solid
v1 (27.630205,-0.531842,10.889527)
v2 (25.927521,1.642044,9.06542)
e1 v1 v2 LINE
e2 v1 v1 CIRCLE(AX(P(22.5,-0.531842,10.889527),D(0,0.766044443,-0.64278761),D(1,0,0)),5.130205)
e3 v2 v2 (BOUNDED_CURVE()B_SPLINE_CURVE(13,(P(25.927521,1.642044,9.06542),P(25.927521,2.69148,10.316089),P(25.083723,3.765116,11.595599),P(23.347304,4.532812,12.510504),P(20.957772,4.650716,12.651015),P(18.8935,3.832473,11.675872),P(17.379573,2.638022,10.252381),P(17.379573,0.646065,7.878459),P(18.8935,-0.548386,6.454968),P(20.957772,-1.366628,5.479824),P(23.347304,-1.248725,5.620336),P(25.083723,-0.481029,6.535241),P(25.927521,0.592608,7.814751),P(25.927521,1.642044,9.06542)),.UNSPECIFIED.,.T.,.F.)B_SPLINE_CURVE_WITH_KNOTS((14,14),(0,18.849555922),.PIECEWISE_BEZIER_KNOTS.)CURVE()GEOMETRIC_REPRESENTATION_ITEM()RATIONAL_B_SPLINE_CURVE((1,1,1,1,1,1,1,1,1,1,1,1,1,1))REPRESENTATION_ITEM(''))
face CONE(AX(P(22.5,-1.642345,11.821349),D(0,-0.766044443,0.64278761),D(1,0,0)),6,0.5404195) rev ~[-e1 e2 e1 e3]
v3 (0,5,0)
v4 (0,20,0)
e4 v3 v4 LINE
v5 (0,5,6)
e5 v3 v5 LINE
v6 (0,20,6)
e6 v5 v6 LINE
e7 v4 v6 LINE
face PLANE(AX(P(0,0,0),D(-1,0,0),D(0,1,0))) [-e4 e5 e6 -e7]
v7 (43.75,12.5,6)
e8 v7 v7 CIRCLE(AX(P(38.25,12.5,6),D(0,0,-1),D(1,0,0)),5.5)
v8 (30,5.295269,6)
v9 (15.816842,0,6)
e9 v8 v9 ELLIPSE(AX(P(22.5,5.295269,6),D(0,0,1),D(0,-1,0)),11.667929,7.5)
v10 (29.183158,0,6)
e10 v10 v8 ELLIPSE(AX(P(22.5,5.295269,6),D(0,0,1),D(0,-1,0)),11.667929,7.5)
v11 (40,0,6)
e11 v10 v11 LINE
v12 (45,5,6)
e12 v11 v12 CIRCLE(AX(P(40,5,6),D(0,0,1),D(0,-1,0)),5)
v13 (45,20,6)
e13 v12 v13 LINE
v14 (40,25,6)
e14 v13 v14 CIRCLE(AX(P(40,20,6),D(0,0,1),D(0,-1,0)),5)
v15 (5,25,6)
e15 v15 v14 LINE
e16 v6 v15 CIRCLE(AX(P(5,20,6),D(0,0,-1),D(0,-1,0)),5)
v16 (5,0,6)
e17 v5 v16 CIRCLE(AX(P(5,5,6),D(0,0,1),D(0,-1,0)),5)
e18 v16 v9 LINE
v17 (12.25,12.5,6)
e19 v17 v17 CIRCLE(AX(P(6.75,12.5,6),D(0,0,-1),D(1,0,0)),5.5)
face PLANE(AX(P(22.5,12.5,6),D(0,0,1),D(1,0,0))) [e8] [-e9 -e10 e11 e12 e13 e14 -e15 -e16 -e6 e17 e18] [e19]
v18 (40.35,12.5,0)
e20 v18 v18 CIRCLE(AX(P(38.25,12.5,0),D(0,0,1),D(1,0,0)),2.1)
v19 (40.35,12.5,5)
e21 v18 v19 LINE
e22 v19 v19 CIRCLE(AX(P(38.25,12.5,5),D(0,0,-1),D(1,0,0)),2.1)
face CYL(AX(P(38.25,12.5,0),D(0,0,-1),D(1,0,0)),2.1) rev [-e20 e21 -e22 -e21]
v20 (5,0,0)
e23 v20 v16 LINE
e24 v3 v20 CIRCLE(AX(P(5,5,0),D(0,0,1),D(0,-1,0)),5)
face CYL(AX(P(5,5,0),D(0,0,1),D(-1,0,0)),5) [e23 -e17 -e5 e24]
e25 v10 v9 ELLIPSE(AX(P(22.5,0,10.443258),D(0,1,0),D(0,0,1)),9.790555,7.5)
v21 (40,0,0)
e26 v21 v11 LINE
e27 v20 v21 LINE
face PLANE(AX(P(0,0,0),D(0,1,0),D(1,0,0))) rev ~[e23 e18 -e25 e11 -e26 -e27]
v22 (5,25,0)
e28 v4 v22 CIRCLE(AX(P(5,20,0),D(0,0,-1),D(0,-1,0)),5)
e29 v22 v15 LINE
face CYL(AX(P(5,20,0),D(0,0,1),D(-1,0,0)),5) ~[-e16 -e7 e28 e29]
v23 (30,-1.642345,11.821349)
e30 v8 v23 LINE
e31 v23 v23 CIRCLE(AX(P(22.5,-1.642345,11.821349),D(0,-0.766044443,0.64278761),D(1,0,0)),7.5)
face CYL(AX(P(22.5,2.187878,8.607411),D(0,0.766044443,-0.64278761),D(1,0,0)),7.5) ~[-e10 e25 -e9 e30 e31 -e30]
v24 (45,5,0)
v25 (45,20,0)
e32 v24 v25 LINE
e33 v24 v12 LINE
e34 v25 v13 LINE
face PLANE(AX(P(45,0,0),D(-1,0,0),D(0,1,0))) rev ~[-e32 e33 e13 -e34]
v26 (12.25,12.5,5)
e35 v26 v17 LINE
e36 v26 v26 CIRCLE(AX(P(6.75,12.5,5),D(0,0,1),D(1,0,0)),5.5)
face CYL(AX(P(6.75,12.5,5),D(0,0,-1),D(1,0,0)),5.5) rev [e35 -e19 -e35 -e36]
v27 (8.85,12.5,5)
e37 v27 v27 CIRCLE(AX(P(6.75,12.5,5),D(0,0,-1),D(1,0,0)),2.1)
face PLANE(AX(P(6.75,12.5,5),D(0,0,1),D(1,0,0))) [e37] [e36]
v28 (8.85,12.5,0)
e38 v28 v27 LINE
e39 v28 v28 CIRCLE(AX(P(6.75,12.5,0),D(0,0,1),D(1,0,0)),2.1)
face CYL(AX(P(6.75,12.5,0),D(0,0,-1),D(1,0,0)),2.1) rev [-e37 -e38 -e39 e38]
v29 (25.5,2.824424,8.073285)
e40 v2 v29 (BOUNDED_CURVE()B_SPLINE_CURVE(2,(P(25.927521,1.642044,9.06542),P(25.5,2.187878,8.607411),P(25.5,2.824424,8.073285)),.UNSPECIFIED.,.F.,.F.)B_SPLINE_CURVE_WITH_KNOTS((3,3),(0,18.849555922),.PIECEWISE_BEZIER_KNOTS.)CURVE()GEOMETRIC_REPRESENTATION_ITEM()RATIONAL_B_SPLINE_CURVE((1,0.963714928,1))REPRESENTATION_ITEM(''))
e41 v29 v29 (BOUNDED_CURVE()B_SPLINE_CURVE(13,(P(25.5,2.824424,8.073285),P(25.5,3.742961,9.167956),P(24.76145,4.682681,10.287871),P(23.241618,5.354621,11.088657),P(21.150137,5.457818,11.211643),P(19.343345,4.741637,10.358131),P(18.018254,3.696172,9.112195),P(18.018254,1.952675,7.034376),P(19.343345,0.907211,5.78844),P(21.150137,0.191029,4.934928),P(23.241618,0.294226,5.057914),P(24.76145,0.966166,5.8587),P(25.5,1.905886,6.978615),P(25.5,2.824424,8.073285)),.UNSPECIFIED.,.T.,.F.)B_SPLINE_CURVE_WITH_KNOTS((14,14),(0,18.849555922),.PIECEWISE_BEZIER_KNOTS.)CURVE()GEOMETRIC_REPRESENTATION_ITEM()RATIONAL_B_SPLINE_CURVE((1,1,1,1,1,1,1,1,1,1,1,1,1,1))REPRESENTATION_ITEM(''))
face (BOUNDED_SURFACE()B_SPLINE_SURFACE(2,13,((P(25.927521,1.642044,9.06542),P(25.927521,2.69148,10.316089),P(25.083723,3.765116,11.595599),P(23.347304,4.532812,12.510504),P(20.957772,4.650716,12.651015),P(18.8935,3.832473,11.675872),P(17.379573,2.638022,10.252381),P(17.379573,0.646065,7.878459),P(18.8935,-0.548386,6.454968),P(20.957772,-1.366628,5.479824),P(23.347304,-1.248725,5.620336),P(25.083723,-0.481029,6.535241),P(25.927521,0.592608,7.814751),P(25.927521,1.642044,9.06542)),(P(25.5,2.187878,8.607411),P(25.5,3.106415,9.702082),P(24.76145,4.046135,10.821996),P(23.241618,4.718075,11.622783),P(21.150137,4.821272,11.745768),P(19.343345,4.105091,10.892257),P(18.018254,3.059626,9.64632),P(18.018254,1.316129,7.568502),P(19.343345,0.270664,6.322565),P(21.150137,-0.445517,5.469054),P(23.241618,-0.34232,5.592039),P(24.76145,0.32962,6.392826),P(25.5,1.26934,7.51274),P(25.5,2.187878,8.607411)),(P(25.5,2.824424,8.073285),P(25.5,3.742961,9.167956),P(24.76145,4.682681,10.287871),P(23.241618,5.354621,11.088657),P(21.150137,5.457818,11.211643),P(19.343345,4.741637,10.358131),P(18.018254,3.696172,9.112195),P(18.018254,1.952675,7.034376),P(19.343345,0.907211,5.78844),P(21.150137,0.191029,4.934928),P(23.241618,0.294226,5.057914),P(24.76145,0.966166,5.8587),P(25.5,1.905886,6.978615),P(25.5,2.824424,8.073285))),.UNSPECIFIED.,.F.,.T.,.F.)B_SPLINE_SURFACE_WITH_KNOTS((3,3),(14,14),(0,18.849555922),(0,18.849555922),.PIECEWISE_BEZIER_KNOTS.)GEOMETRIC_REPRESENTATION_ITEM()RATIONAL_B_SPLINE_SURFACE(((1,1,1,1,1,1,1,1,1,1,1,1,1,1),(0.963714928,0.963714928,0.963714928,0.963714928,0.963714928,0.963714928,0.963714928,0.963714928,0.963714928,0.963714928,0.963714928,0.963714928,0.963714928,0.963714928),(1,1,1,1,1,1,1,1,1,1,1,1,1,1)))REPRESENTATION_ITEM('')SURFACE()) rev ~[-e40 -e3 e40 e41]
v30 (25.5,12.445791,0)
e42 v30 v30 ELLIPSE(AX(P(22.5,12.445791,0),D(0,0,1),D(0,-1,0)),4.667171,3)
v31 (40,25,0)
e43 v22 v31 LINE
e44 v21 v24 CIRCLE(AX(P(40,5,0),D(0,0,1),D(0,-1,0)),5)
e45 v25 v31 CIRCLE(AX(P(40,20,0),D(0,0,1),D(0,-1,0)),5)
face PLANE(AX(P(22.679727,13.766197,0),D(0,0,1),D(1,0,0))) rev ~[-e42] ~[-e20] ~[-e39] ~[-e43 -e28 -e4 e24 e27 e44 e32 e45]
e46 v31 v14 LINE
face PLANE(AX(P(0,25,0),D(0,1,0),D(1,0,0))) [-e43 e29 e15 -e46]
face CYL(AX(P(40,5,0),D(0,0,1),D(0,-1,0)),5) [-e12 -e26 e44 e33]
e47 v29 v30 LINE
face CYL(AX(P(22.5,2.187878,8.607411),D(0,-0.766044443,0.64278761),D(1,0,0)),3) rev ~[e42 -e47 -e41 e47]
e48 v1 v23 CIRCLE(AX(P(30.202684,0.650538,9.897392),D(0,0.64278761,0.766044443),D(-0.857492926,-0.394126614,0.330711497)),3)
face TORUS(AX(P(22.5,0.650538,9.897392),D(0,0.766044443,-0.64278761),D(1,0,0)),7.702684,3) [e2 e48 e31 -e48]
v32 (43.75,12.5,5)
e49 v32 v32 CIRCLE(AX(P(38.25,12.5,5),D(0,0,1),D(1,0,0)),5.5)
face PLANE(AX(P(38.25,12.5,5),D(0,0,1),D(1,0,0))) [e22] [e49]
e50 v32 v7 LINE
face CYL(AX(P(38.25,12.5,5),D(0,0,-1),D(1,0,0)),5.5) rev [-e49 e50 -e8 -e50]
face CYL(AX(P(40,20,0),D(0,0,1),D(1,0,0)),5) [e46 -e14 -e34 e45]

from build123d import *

# Parameters (mm, degrees)
F0_W           = 45
F0_H           = 25
F1_DEPTH       = 6
F2_R           = 5
F4_R           = 5.5
F5_DEPTH       = 25
F6_R           = 2.1
F7_DEPTH       = 25
F9_R           = 7.5
F10_DEPTH      = 5
F10_DEPTH_BACK = 25
F11_W          = 49.2877000943
F11_H          = 30.2235903218
F12_DEPTH      = 25
F13_W          = 37.6632460393
F13_H          = 10.6945014559
F14_DEPTH      = 25
F15_R          = 3
F16_DEPTH      = 25
F16_DEPTH_BACK = 25
F18_R          = 3


# Not quite as in the source:
# - a fillet or chamfer that OpenCascade refuses, or shapes differently, is made with other operations: its cross-section is extruded or revolved along the edge and cut away or added


with BuildPart() as f1:
    # F0 (on Top) → F1 (new body)
    with BuildSketch(Plane.XY):
        with Locations((22.5, 12.5)):
            Rectangle(F0_W, F0_H)
    extrude(amount=F1_DEPTH)

    # F2
    f2_edges = [f1.edges().sort_by_distance(p)[0] for p in [
        (45, 25, 3),
        (45, 0, 3),
        (0, 25, 3),
        (0, 0, 3),
    ]]
    fillet(f2_edges, radius=F2_R)

    # F4 (on offset) → F5 (cut)
    with BuildSketch(Plane.XY.offset(5)):
        with Locations((6.75, 12.5)):
            Circle(F4_R)
        with Locations((38.25, 12.5)):
            Circle(F4_R)
    extrude(amount=F5_DEPTH, mode=Mode.SUBTRACT)

    # F6 (on Top) → F7 (cut)
    with BuildSketch(Plane.XY):
        with Locations((6.75, 12.5)):
            Circle(F6_R)
        with Locations((38.25, 12.5)):
            Circle(F6_R)
    extrude(amount=F7_DEPTH, mode=Mode.SUBTRACT)

    # F9 (on face) → F10 (join, two sides)
    with BuildSketch(Plane(origin=(0, -2.954423259, 2.479055467), x_dir=(1, 0, 0), z_dir=(0, -0.7660444431, 0.6427876097))) as f10_sk:
        with Locations((22.5, 8)):
            Circle(F9_R)
    extrude(amount=F10_DEPTH)
    extrude(f10_sk.sketch, amount=-F10_DEPTH_BACK)

    # F11 (on Top) → F12 (cut)
    with BuildSketch(Plane.XY):
        with Locations((22.6797270589, 13.7661970221)):
            Rectangle(F11_W, F11_H)
    extrude(amount=-F12_DEPTH, mode=Mode.SUBTRACT)

    # F13 (on face) → F14 (cut)
    with BuildSketch(Plane(origin=(0, 25, 0), x_dir=(-1, 0, 0), z_dir=(0, 1, 0))):
        with Locations((-22.6992729586, 2.3689556401)):
            Rectangle(F13_W, F13_H)
    extrude(amount=F14_DEPTH, mode=Mode.SUBTRACT)

    # F15 (on face) → F16 (cut, two sides)
    with BuildSketch(Plane(origin=(0, -2.954423259, 2.479055467), x_dir=(1, 0, 0), z_dir=(0, -0.7660444431, 0.6427876097))) as f16_sk:
        with Locations((22.5, 8)):
            Circle(F15_R)
    extrude(amount=F16_DEPTH, mode=Mode.SUBTRACT)
    extrude(f16_sk.sketch, amount=-F16_DEPTH_BACK, mode=Mode.SUBTRACT)

    # F17: chamfer of 3 x 5 on 1 edges, made by hand

    # F17_s1 → F17_t2 (revolve, cut)
    with BuildSketch(Plane(origin=(0, 5.1423008775, 6.128355545), x_dir=(1, 0, 0), z_dir=(0, 0.6427876097, 0.7660444431))):
        Polygon((28.5, -8.8567256581), (25.5, -3.8567256581), (25.5, -8.8567256581), align=None)
    revolve(axis=Axis((22.5, -1.6423445971, 11.8213490604), (0, 0.7660444431, -0.6427876097)), mode=Mode.SUBTRACT)

    # F18
    f18_edges = [f1.edges().sort_by_distance(p)[0] for p in [
        (19.5, 2.187878, 8.607411),
    ]]
    fillet(f18_edges, radius=F18_R)

    # F19: fillet of radius 3 on 1 edges, made by hand

    # F19_s1 → F19_t2 (revolve, cut)
    with BuildSketch(Plane(origin=(0, 5.1423008775, 6.128355545), x_dir=(1, 0, 0), z_dir=(0, 0.6427876097, 0.7660444431))):
        with BuildLine():
            ThreePointArc((27.6302051352, -7.4070675501), (28.6371938466, -8.4227287465), (30, -8.8567256581))
            Line((30, -8.8567256581), (28.5, -8.8567256581))
            Line((28.5, -8.8567256581), (27.6302051352, -7.4070675501))
        make_face()
    revolve(axis=Axis((22.5, -1.6423445971, 11.8213490604), (0, 0.7660444431, -0.6427876097)), mode=Mode.SUBTRACT)


solid = f1.part
